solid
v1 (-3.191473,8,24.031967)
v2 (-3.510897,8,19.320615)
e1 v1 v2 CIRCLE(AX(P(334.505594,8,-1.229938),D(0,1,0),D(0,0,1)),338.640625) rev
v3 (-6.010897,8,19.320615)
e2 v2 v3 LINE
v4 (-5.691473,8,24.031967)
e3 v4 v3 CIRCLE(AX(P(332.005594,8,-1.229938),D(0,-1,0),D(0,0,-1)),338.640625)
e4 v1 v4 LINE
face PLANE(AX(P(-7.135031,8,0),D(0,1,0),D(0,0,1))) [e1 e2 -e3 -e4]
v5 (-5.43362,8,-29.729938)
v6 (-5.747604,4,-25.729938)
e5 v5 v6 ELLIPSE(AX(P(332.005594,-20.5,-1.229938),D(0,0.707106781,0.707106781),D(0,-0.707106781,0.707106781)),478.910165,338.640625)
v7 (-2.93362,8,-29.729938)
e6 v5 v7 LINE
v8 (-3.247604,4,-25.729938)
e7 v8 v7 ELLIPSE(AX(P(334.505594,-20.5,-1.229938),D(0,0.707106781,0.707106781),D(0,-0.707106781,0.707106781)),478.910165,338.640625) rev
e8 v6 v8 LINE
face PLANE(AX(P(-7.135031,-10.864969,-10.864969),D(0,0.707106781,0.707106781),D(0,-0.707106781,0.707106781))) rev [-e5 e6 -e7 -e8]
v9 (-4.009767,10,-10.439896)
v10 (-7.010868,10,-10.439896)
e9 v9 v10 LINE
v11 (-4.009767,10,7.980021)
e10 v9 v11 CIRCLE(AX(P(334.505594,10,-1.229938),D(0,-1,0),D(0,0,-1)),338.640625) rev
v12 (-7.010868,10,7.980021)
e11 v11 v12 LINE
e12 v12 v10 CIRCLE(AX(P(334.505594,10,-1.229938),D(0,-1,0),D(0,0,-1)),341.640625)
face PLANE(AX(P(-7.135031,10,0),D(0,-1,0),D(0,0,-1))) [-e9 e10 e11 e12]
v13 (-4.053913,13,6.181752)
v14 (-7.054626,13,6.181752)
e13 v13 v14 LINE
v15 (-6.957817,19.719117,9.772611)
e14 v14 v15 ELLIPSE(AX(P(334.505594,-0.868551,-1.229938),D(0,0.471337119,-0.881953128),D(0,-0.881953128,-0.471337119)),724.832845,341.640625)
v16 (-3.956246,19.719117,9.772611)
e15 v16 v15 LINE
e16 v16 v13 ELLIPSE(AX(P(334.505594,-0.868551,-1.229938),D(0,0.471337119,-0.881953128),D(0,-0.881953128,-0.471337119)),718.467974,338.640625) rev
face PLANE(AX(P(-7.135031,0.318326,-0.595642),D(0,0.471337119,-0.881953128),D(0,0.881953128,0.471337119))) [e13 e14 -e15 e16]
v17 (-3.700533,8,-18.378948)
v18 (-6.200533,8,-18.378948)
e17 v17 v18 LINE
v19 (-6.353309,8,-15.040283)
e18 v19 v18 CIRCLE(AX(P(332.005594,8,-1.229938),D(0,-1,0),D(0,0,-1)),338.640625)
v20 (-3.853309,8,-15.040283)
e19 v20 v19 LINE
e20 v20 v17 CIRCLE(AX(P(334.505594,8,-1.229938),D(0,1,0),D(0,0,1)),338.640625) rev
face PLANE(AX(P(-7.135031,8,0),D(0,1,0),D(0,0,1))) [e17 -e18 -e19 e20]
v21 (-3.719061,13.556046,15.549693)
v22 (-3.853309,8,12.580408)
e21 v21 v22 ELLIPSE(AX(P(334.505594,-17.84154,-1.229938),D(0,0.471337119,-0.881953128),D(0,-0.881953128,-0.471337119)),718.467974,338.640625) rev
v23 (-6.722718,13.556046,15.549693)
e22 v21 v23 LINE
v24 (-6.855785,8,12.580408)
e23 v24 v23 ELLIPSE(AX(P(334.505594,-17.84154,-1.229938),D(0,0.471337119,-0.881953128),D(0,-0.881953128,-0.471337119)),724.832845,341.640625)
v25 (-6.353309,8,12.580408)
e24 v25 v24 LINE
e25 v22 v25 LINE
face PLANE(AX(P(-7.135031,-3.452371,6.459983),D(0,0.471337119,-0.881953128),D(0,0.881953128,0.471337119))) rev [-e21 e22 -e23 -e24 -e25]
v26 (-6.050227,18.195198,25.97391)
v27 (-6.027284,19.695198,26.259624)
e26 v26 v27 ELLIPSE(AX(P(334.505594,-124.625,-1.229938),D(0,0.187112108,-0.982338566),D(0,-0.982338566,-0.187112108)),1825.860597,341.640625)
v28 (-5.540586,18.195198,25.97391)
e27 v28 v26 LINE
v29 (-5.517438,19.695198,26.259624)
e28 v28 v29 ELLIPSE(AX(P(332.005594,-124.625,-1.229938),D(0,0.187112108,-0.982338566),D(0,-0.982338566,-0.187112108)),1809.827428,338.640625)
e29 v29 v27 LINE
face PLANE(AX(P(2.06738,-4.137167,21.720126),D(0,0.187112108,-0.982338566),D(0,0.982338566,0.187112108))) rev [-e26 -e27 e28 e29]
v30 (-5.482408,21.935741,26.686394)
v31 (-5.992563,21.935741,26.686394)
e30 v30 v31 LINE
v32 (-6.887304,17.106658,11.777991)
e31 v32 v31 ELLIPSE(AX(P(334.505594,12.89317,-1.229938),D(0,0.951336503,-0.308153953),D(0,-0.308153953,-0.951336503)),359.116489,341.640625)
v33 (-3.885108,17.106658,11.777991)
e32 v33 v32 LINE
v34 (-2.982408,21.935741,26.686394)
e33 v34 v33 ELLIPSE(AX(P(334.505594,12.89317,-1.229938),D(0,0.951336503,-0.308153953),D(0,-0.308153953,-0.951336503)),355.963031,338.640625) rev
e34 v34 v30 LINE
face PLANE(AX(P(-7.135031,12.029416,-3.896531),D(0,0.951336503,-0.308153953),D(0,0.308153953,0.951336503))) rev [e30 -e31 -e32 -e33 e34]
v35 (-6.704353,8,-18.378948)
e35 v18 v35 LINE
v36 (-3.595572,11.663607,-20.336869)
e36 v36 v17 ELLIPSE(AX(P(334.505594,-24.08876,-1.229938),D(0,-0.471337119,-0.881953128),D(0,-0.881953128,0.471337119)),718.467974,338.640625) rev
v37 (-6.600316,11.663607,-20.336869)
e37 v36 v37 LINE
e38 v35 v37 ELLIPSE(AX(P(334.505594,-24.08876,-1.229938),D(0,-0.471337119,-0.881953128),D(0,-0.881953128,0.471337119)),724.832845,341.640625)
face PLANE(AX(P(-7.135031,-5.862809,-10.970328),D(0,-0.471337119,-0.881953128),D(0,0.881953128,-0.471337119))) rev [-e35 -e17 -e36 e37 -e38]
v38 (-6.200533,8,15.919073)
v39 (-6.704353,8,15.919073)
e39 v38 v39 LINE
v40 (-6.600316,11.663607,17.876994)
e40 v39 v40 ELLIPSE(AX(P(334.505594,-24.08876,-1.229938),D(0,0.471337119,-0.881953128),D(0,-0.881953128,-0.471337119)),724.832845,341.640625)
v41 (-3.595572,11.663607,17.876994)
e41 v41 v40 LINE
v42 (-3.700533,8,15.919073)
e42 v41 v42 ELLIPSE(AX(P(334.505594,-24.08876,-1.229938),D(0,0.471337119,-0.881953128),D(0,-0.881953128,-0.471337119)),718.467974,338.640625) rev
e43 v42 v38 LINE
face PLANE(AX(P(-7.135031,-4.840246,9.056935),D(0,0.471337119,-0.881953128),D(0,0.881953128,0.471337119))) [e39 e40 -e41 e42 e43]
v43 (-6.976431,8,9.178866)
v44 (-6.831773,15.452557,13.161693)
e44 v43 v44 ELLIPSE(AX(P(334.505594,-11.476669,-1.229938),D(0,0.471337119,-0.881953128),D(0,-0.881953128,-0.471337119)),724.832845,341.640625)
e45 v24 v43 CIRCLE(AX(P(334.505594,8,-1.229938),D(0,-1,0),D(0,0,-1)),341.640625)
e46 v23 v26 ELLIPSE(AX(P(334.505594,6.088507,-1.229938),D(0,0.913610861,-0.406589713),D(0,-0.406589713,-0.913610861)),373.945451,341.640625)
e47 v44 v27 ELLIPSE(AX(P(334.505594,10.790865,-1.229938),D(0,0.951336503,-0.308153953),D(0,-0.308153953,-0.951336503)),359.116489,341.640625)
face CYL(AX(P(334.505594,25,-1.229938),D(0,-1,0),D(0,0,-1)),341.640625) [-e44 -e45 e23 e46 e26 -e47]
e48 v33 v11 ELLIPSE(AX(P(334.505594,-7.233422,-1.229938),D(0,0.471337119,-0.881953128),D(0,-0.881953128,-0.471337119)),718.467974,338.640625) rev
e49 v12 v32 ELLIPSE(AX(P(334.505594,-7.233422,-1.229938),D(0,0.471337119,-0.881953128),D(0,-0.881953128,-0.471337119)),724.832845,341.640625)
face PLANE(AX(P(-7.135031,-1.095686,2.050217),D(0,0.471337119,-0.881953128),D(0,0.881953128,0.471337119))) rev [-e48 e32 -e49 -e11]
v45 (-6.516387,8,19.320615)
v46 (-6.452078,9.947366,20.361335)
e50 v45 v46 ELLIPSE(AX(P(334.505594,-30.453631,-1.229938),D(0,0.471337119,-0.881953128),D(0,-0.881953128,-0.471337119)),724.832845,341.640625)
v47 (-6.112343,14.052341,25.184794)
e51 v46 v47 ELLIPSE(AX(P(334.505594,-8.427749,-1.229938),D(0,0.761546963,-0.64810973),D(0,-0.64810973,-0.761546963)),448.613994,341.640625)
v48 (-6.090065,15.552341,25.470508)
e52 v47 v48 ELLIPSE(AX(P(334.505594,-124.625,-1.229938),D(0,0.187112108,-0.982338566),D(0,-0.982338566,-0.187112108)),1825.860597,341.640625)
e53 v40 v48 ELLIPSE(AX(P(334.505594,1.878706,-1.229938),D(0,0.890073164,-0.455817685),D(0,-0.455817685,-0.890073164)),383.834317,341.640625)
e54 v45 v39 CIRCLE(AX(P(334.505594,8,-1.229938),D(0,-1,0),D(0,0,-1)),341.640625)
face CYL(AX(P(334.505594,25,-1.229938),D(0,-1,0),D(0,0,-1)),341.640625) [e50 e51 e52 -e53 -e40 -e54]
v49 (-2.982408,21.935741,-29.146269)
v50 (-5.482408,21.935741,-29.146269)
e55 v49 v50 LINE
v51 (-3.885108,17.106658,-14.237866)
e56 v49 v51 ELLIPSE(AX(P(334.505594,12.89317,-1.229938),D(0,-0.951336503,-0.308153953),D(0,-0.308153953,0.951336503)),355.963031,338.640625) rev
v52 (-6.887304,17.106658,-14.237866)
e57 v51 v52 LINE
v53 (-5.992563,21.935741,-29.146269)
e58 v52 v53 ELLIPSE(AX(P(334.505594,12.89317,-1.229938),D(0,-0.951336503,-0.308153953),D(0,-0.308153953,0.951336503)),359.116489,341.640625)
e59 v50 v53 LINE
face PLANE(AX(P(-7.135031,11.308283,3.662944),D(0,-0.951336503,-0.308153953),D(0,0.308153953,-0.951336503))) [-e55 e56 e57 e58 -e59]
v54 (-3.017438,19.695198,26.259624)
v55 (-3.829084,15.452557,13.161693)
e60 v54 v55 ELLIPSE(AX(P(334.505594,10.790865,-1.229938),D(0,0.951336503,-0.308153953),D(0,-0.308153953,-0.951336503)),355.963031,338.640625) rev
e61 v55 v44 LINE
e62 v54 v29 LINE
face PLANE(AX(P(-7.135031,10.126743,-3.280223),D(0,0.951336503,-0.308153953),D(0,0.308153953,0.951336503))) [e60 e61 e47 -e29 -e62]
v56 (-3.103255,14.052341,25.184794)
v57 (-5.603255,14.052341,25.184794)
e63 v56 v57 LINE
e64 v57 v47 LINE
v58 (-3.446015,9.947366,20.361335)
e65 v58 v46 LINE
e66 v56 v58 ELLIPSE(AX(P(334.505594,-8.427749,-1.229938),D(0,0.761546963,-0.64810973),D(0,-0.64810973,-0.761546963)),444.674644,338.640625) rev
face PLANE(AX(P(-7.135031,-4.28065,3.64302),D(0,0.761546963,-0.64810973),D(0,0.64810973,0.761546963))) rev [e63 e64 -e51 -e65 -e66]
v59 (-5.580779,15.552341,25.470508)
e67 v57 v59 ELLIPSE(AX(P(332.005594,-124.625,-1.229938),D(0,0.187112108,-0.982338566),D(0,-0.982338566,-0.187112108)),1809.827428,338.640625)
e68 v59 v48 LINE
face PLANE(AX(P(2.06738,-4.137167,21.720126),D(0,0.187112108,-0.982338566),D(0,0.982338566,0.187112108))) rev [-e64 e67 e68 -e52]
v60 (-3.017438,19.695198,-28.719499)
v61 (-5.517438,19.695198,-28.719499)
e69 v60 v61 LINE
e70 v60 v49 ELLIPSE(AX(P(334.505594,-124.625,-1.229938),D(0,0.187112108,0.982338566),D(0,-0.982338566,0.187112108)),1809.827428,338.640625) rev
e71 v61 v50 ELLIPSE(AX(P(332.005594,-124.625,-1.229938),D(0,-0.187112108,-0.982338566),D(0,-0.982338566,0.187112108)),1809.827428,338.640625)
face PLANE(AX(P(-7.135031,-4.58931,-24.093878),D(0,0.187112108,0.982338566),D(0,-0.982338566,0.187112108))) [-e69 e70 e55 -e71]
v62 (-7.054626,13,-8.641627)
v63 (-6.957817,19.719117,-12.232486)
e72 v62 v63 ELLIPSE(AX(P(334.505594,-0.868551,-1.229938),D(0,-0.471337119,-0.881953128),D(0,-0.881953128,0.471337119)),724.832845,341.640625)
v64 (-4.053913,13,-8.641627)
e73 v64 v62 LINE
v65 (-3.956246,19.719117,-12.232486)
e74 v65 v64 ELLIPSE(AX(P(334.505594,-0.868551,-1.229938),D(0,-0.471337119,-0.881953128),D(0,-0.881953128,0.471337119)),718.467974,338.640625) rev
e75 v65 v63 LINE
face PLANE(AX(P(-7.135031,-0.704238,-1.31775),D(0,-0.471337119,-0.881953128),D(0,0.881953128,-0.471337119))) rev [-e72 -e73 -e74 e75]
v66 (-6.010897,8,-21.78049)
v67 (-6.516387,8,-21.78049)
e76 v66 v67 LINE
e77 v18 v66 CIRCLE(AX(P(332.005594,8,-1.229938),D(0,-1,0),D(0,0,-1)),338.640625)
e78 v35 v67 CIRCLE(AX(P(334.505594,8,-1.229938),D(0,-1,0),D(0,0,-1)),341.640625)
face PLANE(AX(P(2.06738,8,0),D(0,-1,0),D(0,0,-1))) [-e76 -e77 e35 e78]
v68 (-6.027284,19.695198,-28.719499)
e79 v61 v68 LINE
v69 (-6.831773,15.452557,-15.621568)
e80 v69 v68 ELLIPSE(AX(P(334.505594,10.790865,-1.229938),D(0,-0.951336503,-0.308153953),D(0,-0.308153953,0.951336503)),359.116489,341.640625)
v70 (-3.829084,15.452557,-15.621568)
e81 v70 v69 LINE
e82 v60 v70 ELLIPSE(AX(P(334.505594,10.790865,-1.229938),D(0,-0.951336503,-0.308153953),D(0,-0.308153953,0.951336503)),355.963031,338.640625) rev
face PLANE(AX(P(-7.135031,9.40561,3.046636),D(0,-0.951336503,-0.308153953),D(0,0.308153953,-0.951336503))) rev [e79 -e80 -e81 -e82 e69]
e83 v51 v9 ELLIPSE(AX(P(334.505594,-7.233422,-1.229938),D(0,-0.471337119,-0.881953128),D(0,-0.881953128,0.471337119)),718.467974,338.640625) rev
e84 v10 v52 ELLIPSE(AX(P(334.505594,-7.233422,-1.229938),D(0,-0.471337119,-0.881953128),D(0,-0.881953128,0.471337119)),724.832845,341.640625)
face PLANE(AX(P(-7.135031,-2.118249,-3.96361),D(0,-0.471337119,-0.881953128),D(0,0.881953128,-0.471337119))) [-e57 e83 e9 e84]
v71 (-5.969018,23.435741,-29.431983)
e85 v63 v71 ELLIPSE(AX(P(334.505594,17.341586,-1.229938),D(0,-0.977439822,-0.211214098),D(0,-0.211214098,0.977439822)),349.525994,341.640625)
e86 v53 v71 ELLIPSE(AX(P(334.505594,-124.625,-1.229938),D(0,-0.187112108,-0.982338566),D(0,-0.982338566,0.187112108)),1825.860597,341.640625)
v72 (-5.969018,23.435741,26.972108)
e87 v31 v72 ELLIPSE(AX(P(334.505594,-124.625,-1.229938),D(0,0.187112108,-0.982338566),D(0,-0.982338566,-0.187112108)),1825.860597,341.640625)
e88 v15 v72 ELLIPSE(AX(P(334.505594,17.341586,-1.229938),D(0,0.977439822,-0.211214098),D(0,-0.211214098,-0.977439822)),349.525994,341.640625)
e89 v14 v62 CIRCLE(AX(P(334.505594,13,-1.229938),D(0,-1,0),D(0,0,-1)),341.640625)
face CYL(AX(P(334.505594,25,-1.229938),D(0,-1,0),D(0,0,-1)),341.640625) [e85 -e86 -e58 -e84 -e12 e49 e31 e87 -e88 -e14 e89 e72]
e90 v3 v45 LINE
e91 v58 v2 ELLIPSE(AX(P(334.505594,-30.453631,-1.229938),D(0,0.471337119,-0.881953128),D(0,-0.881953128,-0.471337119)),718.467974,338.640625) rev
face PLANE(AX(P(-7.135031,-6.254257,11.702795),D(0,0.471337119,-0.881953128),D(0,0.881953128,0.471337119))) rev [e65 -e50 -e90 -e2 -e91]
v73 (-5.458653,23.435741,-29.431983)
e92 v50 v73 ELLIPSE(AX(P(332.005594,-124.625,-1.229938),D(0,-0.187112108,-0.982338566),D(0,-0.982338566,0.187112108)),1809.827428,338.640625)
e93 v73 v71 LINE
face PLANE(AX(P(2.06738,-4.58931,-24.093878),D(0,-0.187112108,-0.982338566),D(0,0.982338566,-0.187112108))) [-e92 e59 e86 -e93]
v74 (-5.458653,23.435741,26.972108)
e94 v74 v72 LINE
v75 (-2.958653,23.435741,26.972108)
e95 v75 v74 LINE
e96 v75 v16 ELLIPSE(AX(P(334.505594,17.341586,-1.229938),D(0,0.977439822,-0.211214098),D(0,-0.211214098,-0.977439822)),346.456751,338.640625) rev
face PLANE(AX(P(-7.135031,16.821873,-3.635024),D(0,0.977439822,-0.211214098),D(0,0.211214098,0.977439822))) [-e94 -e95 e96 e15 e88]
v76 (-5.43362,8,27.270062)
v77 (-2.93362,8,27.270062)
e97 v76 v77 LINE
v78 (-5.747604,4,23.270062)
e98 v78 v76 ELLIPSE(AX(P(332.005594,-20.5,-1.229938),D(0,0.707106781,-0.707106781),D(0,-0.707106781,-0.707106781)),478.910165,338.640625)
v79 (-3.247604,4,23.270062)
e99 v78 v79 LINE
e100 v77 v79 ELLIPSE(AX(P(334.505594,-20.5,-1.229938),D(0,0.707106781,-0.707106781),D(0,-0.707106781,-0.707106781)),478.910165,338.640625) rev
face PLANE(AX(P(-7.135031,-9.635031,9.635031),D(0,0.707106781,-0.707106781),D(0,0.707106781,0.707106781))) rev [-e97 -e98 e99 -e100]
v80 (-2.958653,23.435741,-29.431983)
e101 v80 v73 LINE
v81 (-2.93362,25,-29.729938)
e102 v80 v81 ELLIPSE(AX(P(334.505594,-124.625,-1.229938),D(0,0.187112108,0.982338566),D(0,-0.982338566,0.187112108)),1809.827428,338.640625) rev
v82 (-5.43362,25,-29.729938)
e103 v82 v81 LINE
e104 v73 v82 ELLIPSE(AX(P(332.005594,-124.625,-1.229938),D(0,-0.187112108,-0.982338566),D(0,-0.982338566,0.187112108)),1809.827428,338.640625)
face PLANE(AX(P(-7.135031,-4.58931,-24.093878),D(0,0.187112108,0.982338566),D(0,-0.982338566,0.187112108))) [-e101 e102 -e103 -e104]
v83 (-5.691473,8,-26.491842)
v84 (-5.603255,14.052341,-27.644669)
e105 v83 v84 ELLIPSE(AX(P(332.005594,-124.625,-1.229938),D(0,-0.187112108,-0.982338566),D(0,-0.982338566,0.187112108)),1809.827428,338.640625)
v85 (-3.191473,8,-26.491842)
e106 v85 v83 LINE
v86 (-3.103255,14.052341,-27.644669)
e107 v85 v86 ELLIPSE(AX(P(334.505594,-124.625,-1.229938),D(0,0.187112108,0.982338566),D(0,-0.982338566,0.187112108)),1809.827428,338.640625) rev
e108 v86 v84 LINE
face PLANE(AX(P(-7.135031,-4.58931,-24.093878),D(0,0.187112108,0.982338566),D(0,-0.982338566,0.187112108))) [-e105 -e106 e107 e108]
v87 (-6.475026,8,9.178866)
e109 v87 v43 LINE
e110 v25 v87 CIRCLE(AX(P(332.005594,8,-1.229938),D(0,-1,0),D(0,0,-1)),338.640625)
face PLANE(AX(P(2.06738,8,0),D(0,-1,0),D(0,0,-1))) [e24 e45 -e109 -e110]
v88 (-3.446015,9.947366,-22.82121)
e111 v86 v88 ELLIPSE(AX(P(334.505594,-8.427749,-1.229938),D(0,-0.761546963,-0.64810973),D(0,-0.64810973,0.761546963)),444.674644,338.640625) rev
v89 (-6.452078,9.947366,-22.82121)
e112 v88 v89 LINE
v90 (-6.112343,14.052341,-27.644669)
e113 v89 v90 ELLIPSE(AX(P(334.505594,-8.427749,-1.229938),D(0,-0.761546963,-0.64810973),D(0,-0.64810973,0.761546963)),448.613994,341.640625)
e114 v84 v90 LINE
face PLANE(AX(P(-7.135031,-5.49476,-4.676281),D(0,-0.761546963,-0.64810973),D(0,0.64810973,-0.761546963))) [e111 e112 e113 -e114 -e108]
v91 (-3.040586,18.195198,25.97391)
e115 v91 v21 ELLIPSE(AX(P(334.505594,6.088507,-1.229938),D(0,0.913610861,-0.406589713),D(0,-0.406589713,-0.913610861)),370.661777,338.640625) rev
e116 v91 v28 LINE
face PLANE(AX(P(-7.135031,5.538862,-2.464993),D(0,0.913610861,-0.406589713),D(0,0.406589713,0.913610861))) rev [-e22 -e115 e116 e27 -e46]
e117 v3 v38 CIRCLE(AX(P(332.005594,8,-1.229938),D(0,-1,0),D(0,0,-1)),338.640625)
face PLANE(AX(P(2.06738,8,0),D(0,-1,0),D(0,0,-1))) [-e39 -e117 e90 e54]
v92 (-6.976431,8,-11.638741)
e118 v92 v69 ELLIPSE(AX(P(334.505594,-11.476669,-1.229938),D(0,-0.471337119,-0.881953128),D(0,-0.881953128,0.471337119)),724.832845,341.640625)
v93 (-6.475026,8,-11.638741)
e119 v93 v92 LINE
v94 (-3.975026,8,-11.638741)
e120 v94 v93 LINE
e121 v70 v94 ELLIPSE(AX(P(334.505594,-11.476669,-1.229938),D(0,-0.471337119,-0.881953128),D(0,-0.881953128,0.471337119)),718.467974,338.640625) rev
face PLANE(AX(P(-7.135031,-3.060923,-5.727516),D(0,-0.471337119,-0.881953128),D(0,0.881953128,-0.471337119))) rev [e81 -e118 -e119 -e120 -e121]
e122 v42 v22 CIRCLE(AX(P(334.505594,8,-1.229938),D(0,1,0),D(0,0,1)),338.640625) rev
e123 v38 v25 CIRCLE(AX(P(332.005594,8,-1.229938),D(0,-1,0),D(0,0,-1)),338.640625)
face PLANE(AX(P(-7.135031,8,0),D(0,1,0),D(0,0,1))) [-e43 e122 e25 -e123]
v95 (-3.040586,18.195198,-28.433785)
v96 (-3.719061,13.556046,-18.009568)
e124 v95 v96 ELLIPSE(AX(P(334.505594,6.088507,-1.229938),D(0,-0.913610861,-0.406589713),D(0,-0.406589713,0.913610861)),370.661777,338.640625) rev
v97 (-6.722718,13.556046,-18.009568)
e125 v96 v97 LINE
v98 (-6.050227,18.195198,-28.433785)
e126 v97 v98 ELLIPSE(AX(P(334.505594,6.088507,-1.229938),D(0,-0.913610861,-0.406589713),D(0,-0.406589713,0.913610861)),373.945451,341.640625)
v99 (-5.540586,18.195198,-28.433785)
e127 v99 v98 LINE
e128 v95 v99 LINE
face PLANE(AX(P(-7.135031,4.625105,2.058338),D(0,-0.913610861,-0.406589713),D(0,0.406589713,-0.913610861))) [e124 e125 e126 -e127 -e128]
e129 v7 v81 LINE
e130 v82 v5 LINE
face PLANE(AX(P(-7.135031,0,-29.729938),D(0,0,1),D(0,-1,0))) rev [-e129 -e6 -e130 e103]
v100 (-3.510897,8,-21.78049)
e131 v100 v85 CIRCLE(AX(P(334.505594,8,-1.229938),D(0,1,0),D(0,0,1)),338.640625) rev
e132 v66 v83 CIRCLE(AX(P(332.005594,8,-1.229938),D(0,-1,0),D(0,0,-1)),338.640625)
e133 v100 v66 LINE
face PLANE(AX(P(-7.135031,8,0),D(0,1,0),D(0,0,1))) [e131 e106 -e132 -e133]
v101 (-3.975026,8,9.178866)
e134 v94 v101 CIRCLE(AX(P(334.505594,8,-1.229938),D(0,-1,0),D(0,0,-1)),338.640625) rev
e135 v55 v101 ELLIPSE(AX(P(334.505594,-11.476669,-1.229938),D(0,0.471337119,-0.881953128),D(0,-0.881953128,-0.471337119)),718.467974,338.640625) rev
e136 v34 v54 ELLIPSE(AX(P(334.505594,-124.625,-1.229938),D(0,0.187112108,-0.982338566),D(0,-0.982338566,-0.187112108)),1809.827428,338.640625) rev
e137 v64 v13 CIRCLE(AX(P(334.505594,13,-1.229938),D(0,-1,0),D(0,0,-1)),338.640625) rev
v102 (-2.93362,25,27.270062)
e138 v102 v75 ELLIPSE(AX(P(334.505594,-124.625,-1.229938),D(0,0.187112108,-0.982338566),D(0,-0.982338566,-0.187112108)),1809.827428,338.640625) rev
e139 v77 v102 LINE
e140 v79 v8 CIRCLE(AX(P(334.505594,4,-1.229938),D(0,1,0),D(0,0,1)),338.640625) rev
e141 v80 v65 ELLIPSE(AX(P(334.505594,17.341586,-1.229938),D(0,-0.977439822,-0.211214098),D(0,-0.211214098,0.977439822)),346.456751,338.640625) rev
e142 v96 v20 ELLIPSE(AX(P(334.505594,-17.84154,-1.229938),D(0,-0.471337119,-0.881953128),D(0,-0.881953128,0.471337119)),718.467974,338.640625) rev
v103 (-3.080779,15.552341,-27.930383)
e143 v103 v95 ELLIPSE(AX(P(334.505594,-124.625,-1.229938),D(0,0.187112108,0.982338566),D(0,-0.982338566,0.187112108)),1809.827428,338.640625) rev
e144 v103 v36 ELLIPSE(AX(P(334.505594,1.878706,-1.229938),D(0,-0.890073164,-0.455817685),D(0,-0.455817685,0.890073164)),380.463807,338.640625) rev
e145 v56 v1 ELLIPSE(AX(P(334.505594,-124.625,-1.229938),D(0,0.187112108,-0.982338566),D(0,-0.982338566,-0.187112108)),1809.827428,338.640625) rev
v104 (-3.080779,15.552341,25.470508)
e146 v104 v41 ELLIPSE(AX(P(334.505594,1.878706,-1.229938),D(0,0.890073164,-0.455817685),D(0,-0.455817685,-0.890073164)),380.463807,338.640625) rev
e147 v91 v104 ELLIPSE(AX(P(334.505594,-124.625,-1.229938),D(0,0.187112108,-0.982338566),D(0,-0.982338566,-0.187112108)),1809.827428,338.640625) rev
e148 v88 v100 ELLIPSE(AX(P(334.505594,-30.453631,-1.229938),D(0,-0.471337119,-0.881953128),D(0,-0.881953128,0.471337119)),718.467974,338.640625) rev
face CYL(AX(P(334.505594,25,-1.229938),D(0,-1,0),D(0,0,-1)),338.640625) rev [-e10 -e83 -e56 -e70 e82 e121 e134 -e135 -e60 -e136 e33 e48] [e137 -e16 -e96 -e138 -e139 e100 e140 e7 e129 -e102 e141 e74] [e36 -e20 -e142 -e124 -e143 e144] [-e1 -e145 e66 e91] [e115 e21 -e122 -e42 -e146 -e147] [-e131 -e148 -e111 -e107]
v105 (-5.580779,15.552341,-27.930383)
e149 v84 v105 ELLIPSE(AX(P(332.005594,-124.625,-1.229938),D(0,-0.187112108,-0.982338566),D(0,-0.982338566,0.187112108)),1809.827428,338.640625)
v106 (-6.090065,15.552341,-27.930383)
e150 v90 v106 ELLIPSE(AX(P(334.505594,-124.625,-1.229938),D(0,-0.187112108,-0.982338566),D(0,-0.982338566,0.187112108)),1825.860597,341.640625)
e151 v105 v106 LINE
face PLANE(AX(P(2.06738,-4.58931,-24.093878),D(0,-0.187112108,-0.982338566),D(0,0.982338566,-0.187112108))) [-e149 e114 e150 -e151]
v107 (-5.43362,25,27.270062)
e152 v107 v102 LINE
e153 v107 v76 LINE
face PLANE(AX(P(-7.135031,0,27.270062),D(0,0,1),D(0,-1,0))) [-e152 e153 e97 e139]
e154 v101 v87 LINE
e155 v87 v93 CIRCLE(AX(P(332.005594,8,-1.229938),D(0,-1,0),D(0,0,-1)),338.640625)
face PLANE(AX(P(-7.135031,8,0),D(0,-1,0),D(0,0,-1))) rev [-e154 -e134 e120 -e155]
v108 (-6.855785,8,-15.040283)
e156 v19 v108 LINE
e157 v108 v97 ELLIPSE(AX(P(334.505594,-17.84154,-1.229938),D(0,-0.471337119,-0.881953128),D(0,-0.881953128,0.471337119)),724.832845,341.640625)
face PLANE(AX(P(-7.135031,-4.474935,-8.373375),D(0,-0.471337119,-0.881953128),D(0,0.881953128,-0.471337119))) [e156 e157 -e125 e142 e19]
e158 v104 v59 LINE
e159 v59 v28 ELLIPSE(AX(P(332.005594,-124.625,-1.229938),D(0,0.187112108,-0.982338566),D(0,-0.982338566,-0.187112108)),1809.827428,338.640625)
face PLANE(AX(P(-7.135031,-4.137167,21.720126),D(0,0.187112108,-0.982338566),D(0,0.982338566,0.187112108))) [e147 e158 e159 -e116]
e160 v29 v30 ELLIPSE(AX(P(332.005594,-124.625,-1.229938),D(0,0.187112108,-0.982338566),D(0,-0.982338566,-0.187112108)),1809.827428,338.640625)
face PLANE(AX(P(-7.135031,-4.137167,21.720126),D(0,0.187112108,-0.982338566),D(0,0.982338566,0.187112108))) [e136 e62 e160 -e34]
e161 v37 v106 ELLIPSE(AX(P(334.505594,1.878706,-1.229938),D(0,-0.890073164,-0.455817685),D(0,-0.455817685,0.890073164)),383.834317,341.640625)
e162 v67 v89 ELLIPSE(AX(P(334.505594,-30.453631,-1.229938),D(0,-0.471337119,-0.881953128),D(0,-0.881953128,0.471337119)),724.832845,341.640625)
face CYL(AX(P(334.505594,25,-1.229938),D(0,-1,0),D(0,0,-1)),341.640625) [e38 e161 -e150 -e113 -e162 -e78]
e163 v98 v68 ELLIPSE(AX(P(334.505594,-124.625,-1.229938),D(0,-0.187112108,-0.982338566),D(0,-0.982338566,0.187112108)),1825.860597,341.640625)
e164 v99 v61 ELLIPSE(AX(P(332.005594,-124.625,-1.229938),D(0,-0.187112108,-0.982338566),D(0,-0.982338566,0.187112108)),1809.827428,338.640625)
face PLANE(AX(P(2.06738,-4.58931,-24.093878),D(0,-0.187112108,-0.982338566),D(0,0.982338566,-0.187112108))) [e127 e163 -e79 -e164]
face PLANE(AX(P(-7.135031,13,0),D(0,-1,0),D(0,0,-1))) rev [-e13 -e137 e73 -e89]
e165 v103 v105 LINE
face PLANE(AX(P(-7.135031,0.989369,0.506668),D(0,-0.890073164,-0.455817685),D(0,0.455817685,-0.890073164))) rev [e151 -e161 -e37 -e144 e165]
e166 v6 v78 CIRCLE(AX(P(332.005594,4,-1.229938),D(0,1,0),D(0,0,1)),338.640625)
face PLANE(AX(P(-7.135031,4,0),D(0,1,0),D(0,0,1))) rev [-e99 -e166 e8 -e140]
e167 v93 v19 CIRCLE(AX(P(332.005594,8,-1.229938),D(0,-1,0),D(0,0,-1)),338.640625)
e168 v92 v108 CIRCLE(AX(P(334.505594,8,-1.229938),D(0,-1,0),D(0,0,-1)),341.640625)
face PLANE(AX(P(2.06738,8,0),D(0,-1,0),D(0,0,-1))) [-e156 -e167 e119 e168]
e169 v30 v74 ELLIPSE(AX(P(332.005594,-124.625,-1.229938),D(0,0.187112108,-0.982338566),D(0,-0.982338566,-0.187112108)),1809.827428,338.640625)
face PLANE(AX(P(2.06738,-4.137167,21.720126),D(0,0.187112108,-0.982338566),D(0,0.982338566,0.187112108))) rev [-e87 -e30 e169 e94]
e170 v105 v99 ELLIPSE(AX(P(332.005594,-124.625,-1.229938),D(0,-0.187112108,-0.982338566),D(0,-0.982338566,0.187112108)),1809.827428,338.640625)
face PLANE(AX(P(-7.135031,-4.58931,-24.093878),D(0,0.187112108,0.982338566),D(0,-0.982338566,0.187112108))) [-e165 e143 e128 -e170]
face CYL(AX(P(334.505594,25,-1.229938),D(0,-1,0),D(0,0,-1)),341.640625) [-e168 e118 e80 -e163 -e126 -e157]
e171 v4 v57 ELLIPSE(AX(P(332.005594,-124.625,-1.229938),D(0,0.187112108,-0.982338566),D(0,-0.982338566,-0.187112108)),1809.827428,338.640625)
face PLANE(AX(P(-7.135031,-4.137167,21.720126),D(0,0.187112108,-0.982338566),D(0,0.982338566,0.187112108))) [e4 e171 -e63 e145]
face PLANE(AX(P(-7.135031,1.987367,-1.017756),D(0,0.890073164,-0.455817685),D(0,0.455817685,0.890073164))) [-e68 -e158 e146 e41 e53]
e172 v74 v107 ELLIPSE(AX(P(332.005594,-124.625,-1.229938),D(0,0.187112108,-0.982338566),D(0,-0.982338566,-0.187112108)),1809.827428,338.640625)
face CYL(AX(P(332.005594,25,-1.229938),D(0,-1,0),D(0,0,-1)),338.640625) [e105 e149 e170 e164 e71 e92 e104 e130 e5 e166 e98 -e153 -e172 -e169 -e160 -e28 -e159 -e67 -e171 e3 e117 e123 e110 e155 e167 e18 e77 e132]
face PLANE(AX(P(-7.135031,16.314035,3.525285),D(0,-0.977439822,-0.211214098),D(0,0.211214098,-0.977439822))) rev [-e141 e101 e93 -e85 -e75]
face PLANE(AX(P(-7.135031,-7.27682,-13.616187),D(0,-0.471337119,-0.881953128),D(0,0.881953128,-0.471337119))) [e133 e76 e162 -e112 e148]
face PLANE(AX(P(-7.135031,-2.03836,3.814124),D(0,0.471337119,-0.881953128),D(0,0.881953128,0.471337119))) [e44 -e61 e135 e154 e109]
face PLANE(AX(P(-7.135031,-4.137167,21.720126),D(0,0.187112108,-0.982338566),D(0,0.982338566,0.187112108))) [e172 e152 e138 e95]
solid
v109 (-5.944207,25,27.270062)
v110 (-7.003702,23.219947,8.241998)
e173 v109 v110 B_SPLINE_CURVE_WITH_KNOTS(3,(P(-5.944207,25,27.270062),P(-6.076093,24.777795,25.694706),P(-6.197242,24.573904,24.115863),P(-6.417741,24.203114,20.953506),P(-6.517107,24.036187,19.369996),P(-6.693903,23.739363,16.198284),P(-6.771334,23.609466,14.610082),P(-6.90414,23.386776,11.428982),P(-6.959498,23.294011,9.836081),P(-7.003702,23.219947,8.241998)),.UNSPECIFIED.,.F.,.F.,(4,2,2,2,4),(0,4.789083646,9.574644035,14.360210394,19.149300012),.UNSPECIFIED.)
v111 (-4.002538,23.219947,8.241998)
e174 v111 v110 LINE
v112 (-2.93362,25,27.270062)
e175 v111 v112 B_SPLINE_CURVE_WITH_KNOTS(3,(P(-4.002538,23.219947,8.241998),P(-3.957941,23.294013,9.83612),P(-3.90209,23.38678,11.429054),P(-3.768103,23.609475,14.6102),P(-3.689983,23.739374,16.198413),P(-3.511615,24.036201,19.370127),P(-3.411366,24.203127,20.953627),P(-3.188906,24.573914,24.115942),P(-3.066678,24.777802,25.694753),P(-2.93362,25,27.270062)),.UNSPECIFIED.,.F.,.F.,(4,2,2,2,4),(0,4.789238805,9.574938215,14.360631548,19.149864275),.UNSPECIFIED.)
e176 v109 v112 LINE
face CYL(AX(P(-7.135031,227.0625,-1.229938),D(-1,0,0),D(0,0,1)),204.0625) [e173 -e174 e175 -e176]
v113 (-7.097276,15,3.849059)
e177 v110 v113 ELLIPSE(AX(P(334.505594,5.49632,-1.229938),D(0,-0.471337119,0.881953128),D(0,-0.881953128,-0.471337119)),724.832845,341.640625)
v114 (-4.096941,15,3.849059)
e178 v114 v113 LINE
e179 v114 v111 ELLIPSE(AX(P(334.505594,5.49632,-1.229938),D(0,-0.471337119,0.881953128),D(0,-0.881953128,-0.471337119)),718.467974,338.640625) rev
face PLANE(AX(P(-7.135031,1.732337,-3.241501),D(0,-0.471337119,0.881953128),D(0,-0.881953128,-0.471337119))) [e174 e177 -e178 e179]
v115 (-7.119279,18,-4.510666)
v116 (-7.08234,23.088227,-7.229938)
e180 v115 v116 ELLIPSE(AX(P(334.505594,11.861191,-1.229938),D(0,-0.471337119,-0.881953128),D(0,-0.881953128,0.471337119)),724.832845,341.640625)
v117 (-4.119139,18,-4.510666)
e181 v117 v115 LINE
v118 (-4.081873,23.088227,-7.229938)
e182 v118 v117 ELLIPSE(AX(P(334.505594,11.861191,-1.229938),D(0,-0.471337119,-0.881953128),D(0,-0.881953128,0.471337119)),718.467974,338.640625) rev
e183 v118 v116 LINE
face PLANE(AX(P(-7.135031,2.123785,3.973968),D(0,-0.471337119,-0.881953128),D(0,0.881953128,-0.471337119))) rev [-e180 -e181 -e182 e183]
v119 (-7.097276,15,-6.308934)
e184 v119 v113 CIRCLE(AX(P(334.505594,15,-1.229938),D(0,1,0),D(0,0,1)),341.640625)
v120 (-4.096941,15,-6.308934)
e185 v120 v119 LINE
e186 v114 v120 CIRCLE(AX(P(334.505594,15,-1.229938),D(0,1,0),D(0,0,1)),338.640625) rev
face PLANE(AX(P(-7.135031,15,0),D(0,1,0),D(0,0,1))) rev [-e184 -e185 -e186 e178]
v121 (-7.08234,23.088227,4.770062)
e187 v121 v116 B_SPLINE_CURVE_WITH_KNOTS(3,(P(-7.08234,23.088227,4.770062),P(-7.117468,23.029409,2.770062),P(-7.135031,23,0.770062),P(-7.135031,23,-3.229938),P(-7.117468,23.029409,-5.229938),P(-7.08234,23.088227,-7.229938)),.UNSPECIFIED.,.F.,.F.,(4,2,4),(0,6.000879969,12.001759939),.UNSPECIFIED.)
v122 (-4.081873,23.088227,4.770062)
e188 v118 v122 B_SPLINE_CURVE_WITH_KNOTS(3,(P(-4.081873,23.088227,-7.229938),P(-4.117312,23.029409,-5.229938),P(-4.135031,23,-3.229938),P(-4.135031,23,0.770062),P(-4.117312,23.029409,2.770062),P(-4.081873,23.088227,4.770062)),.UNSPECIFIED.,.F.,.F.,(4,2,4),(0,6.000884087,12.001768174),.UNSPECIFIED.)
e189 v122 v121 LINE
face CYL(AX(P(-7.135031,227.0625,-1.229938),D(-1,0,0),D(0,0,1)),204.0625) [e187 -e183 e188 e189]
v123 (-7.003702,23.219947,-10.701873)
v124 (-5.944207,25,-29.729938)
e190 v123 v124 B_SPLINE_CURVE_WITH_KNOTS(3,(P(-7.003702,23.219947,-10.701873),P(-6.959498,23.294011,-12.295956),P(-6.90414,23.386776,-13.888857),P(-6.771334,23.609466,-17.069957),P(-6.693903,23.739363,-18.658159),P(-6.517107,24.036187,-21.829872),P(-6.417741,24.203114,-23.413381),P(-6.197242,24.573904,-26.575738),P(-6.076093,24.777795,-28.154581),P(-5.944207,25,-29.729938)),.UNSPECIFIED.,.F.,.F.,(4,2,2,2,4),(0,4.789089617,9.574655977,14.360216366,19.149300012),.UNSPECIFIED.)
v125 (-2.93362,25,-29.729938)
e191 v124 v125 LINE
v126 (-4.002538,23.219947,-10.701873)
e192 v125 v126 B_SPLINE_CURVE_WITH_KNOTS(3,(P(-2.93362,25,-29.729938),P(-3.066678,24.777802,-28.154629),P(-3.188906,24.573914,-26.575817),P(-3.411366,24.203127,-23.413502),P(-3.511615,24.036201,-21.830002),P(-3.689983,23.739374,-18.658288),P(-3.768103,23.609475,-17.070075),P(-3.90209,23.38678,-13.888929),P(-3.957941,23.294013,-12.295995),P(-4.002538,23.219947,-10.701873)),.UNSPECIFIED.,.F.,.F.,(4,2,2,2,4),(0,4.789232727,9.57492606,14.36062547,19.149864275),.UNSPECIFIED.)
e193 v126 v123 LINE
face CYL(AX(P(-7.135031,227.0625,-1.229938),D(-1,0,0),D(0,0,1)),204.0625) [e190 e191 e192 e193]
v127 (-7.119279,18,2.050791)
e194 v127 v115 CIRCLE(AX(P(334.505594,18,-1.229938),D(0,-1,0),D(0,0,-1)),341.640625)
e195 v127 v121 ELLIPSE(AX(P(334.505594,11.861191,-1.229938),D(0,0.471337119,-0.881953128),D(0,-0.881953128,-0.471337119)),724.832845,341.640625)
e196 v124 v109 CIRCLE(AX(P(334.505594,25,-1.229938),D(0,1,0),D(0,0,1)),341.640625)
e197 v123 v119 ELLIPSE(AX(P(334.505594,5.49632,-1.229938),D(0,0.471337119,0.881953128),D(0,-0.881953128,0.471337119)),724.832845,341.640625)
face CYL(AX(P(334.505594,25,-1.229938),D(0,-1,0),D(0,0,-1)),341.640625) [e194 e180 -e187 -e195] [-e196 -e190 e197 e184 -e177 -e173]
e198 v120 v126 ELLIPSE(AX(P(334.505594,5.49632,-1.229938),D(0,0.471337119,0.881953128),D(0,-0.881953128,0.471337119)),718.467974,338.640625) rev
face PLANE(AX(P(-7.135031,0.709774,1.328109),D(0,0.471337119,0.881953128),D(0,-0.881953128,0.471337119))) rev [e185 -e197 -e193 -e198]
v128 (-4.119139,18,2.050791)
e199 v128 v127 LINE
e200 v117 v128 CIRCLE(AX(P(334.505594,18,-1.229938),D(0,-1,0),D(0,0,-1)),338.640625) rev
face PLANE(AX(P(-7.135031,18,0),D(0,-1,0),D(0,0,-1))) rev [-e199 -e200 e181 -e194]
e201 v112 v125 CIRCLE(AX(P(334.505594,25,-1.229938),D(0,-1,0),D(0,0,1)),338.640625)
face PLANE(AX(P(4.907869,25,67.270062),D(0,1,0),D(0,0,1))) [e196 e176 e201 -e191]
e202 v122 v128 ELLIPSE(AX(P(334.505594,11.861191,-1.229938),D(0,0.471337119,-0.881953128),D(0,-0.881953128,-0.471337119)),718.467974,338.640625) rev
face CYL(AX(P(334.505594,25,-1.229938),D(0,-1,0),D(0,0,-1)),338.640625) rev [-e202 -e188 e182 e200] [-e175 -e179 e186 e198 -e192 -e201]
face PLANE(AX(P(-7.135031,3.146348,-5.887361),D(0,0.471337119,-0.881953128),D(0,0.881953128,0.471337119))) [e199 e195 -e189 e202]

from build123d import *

# Parameters (mm, degrees)
BOSS_EXTRUDE1_DEPTH      = 25
CUT_EXTRUDE1_DEPTH       = 80.24352506
CUT_EXTRUDE1_DEPTH_BACK  = 80.24352506
SKETCH4_W                = 163.693306888
SKETCH4_H                = 40.024571377
CUT_EXTRUDE3_START       = 2.86496876
CUT_EXTRUDE3_DEPTH       = 1.701411362
CUT_EXTRUDE3_START_2     = 4
CUT_EXTRUDE3_2_DEPTH     = 21
CUT_EXTRUDE3_START_3     = -19
CUT_EXTRUDE3_3_OUTLINE_W = 1.566380122
CUT_EXTRUDE3_3_OUTLINE_H = 41.625991854
CUT_EXTRUDE3_3_DEPTH     = 3.634613826
CUT_EXTRUDE3_START_4     = -15.365386174
CUT_EXTRUDE3_4_OUTLINE_W = 1.566380122
CUT_EXTRUDE3_4_OUTLINE_H = 4.374008146
CUT_EXTRUDE3_4_DEPTH     = 52.325901807
CUT_EXTRUDE8_DEPTH       = 40.481678639
CUT_EXTRUDE8_DEPTH_BACK  = 40.481678639


with BuildPart() as part:
    # Sketch1 → Boss-Extrude1 (new body)
    with BuildSketch(Plane(origin=(0, 0, 0), x_dir=(1, 0, 0), z_dir=(0, 1, 0))):
        with BuildLine():
            Line((4.907868645, 71.729937519), (8.36496876, 71.729937519))
            Line((8.36496876, 71.729937519), (8.36496876, 74.729937519))
            Line((8.36496876, 74.729937519), (4.907868645, 74.729937519))
            ThreePointArc((4.907868645, 74.729937519), (1.752478587, 73.608534376), (0.01247426, 70.74734295))
            ThreePointArc((0.01247426, 70.74734295), (-7.13503124, 1.229937519), (0.01247426, -68.287467911))
            ThreePointArc((0.01247426, -68.287467911), (1.752478587, -71.148659338), (4.907868645, -72.270062481))
            Line((4.907868645, -72.270062481), (8.36496876, -72.270062481))
            Line((8.36496876, -72.270062481), (8.36496876, -69.270062481))
            Line((8.36496876, -69.270062481), (4.907868645, -69.270062481))
            ThreePointArc((4.907868645, -69.270062481), (3.645712622, -68.821501224), (2.949710891, -67.677024653))
            ThreePointArc((2.949710891, -67.677024653), (-4.13503124, 1.229937519), (2.949710891, 70.136899691))
            ThreePointArc((2.949710891, 70.136899691), (3.645712622, 71.281376262), (4.907868645, 71.729937519))
        make_face()
    extrude(amount=BOSS_EXTRUDE1_DEPTH)

    # Sketch4 → Cut-Extrude1 (cut, two sides: drawn at the far end of the back side and taken through both)
    with BuildSketch(Plane(origin=(0, 0, 0), x_dir=(0, 0, -1), z_dir=(1, 0, 0)).offset(-CUT_EXTRUDE1_DEPTH_BACK)):
        with Locations((-1.406411494, 10.890491369)):
            Rectangle(SKETCH4_W, SKETCH4_H)
        Polygon((25.729937519, 4), (-23.270062481, 4), (-27.270062481, 8), (-27.270062481, 25), (29.729937519, 25), (29.729937519, 8), align=None, mode=Mode.SUBTRACT)
    extrude(amount=CUT_EXTRUDE1_DEPTH + CUT_EXTRUDE1_DEPTH_BACK, mode=Mode.SUBTRACT)

    # Cut-Extrude3: read off the stored shape, not the designer's step
    # Cut-Extrude3 outline → Cut-Extrude3 (cut)
    with BuildSketch(Plane(origin=(-10, 0, 0), x_dir=(0, 0, -1), z_dir=(1, 0, 0)).offset(CUT_EXTRUDE3_START)):
        Polygon((26.491842281, 8), (-24.031967243, 8), (-27.270062481, 25), (-27.270062481, 8), (-23.270062481, 4), (25.729937519, 4), (29.729937519, 8), (29.729937519, 25), align=None)
    extrude(amount=CUT_EXTRUDE3_DEPTH, mode=Mode.SUBTRACT)

    # Cut-Extrude3 2 outline → Cut-Extrude3 2 (add)
    with BuildSketch(Plane(origin=(0, 0, 0), x_dir=(1, 0, 0), z_dir=(0, 1, 0)).offset(CUT_EXTRUDE3_START_2)):
        with BuildLine():
            ThreePointArc((-5.433619878, 29.729937519), (-6.63503124, 1.229937519), (-5.433619878, -27.270062481))
            Line((-5.433619878, -27.270062481), (-5.433619878, 29.729937519))
        make_face()
    extrude(amount=CUT_EXTRUDE3_2_DEPTH)

    # Cut-Extrude3 3 outline → Cut-Extrude3 3 (cut)
    with BuildSketch(Plane(origin=(0, 0, 0), x_dir=(1, 0, 0), z_dir=(0, 0.7071067811865476, 0.7071067811865476)).offset(CUT_EXTRUDE3_START_3)):
        with Locations((-6.216809939, 7.187004073)):
            Rectangle(CUT_EXTRUDE3_3_OUTLINE_W, CUT_EXTRUDE3_3_OUTLINE_H)
    extrude(amount=CUT_EXTRUDE3_3_DEPTH, mode=Mode.SUBTRACT)

    # Cut-Extrude3 4 outline → Cut-Extrude3 4 (cut)
    with BuildSketch(Plane(origin=(0, 0, 0), x_dir=(1, 0, 0), z_dir=(0, 0.7071067811865476, 0.7071067811865476)).offset(CUT_EXTRUDE3_START_4)):
        with Locations((-6.216809939, -15.812995927)):
            Rectangle(CUT_EXTRUDE3_4_OUTLINE_W, CUT_EXTRUDE3_4_OUTLINE_H)
    extrude(amount=CUT_EXTRUDE3_4_DEPTH, mode=Mode.SUBTRACT)

    # Sketch8 → Cut-Extrude8 (cut, two sides: drawn at the far end of the back side and taken through both)
    with BuildSketch(Plane(origin=(-10, 0, 0), x_dir=(0, 0, -1), z_dir=(1, 0, 0)).offset(-CUT_EXTRUDE8_DEPTH_BACK)):
        with BuildLine():
            Line((6.308934185, 15), (1.229937519, 15))
            Line((1.229937519, 15), (1.229937519, 13))
            Line((1.229937519, 13), (8.641627042, 13))
            Line((8.641627042, 13), (12.232486064, 19.719117213))
            Line((12.232486064, 19.719117213), (29.431983471, 23.435741248))
            Line((29.431983471, 23.435741248), (29.729937519, 25))
            ThreePointArc((29.729937519, 25), (20.236755242, 23.88709601), (10.701873099, 23.219947174))
            Line((10.701873099, 23.219947174), (6.308934185, 15))
        make_face()
        with BuildLine():
            Line((1.229937519, 13), (1.229937519, 15))
            Line((1.229937519, 15), (-3.849059147, 15))
            Line((-3.849059147, 15), (-8.241998061, 23.219947174))
            ThreePointArc((-8.241998061, 23.219947174), (-17.776880204, 23.88709601), (-27.270062481, 25))
            Line((-27.270062481, 25), (-26.972108433, 23.435741248))
            Line((-26.972108433, 23.435741248), (-9.772611026, 19.719117213))
            Line((-9.772611026, 19.719117213), (-6.181752003, 13))
            Line((-6.181752003, 13), (1.229937519, 13))
        make_face()
        Polygon((10.439895671, 10), (1.229937519, 10), (1.229937519, 8), (11.638741425, 8), (15.621568327, 15.452556791), (28.719498973, 19.695197632), (29.146269185, 21.935741248), (14.237865718, 17.106657698), align=None)
        Polygon((1.229937519, 8), (1.229937519, 10), (-7.980020633, 10), (-11.77799068, 17.106657698), (-26.686394147, 21.935741248), (-26.259623935, 19.695197632), (-13.161693289, 15.452556791), (-9.178866387, 8), align=None)
        Polygon((18.009568459, 13.556046251), (15.040282736, 8), (18.378948493, 8), (20.33686857, 11.663606509), (27.93038346, 15.552341188), (28.433784687, 18.195197632), align=None)
        Polygon((-17.876993532, 11.663606509), (-15.919073455, 8), (-12.580407697, 8), (-15.54969342, 13.556046251), (-25.973909649, 18.195197632), (-25.470508422, 15.552341188), align=None)
        Polygon((-25.184794136, 14.052341188), (-20.361334539, 9.947366382), (-19.320614766, 8), (-24.031967243, 8), align=None)
        Polygon((22.821209577, 9.947366382), (21.780489804, 8), (26.491842281, 8), (27.644669174, 14.052341188), align=None)
        with BuildLine():
            Line((1.229937519, 23), (1.229937519, 18))
            Line((1.229937519, 18), (4.510665555, 18))
            Line((4.510665555, 18), (7.229937519, 23.088227342))
            ThreePointArc((7.229937519, 23.088227342), (4.230261838, 23.022058028), (1.229937519, 23))
        make_face()
        with BuildLine():
            Line((-2.050790517, 18), (1.229937519, 18))
            Line((1.229937519, 18), (1.229937519, 23))
            ThreePointArc((1.229937519, 23), (-1.770386799, 23.022058028), (-4.770062481, 23.088227342))
            Line((-4.770062481, 23.088227342), (-2.050790517, 18))
        make_face()
    extrude(amount=CUT_EXTRUDE8_DEPTH + CUT_EXTRUDE8_DEPTH_BACK, mode=Mode.SUBTRACT)


with BuildPart() as cut_extrude8_piece_1:
    # of the separate pieces the step leaves, piece 1, a body of its own (cut_extrude8_pieces)
    add(part.part.solids().sort_by_distance((-2.933619878, 8, 27.270062481))[0])


with BuildPart() as cut_extrude8_piece_2:
    # of the separate pieces the step leaves, piece 2, a body of its own (cut_extrude8_pieces)
    add(part.part.solids().sort_by_distance((-4.002538103, 23.219947174, 8.241998061))[0])


solid = Compound([cut_extrude8_piece_1.part, cut_extrude8_piece_2.part])
